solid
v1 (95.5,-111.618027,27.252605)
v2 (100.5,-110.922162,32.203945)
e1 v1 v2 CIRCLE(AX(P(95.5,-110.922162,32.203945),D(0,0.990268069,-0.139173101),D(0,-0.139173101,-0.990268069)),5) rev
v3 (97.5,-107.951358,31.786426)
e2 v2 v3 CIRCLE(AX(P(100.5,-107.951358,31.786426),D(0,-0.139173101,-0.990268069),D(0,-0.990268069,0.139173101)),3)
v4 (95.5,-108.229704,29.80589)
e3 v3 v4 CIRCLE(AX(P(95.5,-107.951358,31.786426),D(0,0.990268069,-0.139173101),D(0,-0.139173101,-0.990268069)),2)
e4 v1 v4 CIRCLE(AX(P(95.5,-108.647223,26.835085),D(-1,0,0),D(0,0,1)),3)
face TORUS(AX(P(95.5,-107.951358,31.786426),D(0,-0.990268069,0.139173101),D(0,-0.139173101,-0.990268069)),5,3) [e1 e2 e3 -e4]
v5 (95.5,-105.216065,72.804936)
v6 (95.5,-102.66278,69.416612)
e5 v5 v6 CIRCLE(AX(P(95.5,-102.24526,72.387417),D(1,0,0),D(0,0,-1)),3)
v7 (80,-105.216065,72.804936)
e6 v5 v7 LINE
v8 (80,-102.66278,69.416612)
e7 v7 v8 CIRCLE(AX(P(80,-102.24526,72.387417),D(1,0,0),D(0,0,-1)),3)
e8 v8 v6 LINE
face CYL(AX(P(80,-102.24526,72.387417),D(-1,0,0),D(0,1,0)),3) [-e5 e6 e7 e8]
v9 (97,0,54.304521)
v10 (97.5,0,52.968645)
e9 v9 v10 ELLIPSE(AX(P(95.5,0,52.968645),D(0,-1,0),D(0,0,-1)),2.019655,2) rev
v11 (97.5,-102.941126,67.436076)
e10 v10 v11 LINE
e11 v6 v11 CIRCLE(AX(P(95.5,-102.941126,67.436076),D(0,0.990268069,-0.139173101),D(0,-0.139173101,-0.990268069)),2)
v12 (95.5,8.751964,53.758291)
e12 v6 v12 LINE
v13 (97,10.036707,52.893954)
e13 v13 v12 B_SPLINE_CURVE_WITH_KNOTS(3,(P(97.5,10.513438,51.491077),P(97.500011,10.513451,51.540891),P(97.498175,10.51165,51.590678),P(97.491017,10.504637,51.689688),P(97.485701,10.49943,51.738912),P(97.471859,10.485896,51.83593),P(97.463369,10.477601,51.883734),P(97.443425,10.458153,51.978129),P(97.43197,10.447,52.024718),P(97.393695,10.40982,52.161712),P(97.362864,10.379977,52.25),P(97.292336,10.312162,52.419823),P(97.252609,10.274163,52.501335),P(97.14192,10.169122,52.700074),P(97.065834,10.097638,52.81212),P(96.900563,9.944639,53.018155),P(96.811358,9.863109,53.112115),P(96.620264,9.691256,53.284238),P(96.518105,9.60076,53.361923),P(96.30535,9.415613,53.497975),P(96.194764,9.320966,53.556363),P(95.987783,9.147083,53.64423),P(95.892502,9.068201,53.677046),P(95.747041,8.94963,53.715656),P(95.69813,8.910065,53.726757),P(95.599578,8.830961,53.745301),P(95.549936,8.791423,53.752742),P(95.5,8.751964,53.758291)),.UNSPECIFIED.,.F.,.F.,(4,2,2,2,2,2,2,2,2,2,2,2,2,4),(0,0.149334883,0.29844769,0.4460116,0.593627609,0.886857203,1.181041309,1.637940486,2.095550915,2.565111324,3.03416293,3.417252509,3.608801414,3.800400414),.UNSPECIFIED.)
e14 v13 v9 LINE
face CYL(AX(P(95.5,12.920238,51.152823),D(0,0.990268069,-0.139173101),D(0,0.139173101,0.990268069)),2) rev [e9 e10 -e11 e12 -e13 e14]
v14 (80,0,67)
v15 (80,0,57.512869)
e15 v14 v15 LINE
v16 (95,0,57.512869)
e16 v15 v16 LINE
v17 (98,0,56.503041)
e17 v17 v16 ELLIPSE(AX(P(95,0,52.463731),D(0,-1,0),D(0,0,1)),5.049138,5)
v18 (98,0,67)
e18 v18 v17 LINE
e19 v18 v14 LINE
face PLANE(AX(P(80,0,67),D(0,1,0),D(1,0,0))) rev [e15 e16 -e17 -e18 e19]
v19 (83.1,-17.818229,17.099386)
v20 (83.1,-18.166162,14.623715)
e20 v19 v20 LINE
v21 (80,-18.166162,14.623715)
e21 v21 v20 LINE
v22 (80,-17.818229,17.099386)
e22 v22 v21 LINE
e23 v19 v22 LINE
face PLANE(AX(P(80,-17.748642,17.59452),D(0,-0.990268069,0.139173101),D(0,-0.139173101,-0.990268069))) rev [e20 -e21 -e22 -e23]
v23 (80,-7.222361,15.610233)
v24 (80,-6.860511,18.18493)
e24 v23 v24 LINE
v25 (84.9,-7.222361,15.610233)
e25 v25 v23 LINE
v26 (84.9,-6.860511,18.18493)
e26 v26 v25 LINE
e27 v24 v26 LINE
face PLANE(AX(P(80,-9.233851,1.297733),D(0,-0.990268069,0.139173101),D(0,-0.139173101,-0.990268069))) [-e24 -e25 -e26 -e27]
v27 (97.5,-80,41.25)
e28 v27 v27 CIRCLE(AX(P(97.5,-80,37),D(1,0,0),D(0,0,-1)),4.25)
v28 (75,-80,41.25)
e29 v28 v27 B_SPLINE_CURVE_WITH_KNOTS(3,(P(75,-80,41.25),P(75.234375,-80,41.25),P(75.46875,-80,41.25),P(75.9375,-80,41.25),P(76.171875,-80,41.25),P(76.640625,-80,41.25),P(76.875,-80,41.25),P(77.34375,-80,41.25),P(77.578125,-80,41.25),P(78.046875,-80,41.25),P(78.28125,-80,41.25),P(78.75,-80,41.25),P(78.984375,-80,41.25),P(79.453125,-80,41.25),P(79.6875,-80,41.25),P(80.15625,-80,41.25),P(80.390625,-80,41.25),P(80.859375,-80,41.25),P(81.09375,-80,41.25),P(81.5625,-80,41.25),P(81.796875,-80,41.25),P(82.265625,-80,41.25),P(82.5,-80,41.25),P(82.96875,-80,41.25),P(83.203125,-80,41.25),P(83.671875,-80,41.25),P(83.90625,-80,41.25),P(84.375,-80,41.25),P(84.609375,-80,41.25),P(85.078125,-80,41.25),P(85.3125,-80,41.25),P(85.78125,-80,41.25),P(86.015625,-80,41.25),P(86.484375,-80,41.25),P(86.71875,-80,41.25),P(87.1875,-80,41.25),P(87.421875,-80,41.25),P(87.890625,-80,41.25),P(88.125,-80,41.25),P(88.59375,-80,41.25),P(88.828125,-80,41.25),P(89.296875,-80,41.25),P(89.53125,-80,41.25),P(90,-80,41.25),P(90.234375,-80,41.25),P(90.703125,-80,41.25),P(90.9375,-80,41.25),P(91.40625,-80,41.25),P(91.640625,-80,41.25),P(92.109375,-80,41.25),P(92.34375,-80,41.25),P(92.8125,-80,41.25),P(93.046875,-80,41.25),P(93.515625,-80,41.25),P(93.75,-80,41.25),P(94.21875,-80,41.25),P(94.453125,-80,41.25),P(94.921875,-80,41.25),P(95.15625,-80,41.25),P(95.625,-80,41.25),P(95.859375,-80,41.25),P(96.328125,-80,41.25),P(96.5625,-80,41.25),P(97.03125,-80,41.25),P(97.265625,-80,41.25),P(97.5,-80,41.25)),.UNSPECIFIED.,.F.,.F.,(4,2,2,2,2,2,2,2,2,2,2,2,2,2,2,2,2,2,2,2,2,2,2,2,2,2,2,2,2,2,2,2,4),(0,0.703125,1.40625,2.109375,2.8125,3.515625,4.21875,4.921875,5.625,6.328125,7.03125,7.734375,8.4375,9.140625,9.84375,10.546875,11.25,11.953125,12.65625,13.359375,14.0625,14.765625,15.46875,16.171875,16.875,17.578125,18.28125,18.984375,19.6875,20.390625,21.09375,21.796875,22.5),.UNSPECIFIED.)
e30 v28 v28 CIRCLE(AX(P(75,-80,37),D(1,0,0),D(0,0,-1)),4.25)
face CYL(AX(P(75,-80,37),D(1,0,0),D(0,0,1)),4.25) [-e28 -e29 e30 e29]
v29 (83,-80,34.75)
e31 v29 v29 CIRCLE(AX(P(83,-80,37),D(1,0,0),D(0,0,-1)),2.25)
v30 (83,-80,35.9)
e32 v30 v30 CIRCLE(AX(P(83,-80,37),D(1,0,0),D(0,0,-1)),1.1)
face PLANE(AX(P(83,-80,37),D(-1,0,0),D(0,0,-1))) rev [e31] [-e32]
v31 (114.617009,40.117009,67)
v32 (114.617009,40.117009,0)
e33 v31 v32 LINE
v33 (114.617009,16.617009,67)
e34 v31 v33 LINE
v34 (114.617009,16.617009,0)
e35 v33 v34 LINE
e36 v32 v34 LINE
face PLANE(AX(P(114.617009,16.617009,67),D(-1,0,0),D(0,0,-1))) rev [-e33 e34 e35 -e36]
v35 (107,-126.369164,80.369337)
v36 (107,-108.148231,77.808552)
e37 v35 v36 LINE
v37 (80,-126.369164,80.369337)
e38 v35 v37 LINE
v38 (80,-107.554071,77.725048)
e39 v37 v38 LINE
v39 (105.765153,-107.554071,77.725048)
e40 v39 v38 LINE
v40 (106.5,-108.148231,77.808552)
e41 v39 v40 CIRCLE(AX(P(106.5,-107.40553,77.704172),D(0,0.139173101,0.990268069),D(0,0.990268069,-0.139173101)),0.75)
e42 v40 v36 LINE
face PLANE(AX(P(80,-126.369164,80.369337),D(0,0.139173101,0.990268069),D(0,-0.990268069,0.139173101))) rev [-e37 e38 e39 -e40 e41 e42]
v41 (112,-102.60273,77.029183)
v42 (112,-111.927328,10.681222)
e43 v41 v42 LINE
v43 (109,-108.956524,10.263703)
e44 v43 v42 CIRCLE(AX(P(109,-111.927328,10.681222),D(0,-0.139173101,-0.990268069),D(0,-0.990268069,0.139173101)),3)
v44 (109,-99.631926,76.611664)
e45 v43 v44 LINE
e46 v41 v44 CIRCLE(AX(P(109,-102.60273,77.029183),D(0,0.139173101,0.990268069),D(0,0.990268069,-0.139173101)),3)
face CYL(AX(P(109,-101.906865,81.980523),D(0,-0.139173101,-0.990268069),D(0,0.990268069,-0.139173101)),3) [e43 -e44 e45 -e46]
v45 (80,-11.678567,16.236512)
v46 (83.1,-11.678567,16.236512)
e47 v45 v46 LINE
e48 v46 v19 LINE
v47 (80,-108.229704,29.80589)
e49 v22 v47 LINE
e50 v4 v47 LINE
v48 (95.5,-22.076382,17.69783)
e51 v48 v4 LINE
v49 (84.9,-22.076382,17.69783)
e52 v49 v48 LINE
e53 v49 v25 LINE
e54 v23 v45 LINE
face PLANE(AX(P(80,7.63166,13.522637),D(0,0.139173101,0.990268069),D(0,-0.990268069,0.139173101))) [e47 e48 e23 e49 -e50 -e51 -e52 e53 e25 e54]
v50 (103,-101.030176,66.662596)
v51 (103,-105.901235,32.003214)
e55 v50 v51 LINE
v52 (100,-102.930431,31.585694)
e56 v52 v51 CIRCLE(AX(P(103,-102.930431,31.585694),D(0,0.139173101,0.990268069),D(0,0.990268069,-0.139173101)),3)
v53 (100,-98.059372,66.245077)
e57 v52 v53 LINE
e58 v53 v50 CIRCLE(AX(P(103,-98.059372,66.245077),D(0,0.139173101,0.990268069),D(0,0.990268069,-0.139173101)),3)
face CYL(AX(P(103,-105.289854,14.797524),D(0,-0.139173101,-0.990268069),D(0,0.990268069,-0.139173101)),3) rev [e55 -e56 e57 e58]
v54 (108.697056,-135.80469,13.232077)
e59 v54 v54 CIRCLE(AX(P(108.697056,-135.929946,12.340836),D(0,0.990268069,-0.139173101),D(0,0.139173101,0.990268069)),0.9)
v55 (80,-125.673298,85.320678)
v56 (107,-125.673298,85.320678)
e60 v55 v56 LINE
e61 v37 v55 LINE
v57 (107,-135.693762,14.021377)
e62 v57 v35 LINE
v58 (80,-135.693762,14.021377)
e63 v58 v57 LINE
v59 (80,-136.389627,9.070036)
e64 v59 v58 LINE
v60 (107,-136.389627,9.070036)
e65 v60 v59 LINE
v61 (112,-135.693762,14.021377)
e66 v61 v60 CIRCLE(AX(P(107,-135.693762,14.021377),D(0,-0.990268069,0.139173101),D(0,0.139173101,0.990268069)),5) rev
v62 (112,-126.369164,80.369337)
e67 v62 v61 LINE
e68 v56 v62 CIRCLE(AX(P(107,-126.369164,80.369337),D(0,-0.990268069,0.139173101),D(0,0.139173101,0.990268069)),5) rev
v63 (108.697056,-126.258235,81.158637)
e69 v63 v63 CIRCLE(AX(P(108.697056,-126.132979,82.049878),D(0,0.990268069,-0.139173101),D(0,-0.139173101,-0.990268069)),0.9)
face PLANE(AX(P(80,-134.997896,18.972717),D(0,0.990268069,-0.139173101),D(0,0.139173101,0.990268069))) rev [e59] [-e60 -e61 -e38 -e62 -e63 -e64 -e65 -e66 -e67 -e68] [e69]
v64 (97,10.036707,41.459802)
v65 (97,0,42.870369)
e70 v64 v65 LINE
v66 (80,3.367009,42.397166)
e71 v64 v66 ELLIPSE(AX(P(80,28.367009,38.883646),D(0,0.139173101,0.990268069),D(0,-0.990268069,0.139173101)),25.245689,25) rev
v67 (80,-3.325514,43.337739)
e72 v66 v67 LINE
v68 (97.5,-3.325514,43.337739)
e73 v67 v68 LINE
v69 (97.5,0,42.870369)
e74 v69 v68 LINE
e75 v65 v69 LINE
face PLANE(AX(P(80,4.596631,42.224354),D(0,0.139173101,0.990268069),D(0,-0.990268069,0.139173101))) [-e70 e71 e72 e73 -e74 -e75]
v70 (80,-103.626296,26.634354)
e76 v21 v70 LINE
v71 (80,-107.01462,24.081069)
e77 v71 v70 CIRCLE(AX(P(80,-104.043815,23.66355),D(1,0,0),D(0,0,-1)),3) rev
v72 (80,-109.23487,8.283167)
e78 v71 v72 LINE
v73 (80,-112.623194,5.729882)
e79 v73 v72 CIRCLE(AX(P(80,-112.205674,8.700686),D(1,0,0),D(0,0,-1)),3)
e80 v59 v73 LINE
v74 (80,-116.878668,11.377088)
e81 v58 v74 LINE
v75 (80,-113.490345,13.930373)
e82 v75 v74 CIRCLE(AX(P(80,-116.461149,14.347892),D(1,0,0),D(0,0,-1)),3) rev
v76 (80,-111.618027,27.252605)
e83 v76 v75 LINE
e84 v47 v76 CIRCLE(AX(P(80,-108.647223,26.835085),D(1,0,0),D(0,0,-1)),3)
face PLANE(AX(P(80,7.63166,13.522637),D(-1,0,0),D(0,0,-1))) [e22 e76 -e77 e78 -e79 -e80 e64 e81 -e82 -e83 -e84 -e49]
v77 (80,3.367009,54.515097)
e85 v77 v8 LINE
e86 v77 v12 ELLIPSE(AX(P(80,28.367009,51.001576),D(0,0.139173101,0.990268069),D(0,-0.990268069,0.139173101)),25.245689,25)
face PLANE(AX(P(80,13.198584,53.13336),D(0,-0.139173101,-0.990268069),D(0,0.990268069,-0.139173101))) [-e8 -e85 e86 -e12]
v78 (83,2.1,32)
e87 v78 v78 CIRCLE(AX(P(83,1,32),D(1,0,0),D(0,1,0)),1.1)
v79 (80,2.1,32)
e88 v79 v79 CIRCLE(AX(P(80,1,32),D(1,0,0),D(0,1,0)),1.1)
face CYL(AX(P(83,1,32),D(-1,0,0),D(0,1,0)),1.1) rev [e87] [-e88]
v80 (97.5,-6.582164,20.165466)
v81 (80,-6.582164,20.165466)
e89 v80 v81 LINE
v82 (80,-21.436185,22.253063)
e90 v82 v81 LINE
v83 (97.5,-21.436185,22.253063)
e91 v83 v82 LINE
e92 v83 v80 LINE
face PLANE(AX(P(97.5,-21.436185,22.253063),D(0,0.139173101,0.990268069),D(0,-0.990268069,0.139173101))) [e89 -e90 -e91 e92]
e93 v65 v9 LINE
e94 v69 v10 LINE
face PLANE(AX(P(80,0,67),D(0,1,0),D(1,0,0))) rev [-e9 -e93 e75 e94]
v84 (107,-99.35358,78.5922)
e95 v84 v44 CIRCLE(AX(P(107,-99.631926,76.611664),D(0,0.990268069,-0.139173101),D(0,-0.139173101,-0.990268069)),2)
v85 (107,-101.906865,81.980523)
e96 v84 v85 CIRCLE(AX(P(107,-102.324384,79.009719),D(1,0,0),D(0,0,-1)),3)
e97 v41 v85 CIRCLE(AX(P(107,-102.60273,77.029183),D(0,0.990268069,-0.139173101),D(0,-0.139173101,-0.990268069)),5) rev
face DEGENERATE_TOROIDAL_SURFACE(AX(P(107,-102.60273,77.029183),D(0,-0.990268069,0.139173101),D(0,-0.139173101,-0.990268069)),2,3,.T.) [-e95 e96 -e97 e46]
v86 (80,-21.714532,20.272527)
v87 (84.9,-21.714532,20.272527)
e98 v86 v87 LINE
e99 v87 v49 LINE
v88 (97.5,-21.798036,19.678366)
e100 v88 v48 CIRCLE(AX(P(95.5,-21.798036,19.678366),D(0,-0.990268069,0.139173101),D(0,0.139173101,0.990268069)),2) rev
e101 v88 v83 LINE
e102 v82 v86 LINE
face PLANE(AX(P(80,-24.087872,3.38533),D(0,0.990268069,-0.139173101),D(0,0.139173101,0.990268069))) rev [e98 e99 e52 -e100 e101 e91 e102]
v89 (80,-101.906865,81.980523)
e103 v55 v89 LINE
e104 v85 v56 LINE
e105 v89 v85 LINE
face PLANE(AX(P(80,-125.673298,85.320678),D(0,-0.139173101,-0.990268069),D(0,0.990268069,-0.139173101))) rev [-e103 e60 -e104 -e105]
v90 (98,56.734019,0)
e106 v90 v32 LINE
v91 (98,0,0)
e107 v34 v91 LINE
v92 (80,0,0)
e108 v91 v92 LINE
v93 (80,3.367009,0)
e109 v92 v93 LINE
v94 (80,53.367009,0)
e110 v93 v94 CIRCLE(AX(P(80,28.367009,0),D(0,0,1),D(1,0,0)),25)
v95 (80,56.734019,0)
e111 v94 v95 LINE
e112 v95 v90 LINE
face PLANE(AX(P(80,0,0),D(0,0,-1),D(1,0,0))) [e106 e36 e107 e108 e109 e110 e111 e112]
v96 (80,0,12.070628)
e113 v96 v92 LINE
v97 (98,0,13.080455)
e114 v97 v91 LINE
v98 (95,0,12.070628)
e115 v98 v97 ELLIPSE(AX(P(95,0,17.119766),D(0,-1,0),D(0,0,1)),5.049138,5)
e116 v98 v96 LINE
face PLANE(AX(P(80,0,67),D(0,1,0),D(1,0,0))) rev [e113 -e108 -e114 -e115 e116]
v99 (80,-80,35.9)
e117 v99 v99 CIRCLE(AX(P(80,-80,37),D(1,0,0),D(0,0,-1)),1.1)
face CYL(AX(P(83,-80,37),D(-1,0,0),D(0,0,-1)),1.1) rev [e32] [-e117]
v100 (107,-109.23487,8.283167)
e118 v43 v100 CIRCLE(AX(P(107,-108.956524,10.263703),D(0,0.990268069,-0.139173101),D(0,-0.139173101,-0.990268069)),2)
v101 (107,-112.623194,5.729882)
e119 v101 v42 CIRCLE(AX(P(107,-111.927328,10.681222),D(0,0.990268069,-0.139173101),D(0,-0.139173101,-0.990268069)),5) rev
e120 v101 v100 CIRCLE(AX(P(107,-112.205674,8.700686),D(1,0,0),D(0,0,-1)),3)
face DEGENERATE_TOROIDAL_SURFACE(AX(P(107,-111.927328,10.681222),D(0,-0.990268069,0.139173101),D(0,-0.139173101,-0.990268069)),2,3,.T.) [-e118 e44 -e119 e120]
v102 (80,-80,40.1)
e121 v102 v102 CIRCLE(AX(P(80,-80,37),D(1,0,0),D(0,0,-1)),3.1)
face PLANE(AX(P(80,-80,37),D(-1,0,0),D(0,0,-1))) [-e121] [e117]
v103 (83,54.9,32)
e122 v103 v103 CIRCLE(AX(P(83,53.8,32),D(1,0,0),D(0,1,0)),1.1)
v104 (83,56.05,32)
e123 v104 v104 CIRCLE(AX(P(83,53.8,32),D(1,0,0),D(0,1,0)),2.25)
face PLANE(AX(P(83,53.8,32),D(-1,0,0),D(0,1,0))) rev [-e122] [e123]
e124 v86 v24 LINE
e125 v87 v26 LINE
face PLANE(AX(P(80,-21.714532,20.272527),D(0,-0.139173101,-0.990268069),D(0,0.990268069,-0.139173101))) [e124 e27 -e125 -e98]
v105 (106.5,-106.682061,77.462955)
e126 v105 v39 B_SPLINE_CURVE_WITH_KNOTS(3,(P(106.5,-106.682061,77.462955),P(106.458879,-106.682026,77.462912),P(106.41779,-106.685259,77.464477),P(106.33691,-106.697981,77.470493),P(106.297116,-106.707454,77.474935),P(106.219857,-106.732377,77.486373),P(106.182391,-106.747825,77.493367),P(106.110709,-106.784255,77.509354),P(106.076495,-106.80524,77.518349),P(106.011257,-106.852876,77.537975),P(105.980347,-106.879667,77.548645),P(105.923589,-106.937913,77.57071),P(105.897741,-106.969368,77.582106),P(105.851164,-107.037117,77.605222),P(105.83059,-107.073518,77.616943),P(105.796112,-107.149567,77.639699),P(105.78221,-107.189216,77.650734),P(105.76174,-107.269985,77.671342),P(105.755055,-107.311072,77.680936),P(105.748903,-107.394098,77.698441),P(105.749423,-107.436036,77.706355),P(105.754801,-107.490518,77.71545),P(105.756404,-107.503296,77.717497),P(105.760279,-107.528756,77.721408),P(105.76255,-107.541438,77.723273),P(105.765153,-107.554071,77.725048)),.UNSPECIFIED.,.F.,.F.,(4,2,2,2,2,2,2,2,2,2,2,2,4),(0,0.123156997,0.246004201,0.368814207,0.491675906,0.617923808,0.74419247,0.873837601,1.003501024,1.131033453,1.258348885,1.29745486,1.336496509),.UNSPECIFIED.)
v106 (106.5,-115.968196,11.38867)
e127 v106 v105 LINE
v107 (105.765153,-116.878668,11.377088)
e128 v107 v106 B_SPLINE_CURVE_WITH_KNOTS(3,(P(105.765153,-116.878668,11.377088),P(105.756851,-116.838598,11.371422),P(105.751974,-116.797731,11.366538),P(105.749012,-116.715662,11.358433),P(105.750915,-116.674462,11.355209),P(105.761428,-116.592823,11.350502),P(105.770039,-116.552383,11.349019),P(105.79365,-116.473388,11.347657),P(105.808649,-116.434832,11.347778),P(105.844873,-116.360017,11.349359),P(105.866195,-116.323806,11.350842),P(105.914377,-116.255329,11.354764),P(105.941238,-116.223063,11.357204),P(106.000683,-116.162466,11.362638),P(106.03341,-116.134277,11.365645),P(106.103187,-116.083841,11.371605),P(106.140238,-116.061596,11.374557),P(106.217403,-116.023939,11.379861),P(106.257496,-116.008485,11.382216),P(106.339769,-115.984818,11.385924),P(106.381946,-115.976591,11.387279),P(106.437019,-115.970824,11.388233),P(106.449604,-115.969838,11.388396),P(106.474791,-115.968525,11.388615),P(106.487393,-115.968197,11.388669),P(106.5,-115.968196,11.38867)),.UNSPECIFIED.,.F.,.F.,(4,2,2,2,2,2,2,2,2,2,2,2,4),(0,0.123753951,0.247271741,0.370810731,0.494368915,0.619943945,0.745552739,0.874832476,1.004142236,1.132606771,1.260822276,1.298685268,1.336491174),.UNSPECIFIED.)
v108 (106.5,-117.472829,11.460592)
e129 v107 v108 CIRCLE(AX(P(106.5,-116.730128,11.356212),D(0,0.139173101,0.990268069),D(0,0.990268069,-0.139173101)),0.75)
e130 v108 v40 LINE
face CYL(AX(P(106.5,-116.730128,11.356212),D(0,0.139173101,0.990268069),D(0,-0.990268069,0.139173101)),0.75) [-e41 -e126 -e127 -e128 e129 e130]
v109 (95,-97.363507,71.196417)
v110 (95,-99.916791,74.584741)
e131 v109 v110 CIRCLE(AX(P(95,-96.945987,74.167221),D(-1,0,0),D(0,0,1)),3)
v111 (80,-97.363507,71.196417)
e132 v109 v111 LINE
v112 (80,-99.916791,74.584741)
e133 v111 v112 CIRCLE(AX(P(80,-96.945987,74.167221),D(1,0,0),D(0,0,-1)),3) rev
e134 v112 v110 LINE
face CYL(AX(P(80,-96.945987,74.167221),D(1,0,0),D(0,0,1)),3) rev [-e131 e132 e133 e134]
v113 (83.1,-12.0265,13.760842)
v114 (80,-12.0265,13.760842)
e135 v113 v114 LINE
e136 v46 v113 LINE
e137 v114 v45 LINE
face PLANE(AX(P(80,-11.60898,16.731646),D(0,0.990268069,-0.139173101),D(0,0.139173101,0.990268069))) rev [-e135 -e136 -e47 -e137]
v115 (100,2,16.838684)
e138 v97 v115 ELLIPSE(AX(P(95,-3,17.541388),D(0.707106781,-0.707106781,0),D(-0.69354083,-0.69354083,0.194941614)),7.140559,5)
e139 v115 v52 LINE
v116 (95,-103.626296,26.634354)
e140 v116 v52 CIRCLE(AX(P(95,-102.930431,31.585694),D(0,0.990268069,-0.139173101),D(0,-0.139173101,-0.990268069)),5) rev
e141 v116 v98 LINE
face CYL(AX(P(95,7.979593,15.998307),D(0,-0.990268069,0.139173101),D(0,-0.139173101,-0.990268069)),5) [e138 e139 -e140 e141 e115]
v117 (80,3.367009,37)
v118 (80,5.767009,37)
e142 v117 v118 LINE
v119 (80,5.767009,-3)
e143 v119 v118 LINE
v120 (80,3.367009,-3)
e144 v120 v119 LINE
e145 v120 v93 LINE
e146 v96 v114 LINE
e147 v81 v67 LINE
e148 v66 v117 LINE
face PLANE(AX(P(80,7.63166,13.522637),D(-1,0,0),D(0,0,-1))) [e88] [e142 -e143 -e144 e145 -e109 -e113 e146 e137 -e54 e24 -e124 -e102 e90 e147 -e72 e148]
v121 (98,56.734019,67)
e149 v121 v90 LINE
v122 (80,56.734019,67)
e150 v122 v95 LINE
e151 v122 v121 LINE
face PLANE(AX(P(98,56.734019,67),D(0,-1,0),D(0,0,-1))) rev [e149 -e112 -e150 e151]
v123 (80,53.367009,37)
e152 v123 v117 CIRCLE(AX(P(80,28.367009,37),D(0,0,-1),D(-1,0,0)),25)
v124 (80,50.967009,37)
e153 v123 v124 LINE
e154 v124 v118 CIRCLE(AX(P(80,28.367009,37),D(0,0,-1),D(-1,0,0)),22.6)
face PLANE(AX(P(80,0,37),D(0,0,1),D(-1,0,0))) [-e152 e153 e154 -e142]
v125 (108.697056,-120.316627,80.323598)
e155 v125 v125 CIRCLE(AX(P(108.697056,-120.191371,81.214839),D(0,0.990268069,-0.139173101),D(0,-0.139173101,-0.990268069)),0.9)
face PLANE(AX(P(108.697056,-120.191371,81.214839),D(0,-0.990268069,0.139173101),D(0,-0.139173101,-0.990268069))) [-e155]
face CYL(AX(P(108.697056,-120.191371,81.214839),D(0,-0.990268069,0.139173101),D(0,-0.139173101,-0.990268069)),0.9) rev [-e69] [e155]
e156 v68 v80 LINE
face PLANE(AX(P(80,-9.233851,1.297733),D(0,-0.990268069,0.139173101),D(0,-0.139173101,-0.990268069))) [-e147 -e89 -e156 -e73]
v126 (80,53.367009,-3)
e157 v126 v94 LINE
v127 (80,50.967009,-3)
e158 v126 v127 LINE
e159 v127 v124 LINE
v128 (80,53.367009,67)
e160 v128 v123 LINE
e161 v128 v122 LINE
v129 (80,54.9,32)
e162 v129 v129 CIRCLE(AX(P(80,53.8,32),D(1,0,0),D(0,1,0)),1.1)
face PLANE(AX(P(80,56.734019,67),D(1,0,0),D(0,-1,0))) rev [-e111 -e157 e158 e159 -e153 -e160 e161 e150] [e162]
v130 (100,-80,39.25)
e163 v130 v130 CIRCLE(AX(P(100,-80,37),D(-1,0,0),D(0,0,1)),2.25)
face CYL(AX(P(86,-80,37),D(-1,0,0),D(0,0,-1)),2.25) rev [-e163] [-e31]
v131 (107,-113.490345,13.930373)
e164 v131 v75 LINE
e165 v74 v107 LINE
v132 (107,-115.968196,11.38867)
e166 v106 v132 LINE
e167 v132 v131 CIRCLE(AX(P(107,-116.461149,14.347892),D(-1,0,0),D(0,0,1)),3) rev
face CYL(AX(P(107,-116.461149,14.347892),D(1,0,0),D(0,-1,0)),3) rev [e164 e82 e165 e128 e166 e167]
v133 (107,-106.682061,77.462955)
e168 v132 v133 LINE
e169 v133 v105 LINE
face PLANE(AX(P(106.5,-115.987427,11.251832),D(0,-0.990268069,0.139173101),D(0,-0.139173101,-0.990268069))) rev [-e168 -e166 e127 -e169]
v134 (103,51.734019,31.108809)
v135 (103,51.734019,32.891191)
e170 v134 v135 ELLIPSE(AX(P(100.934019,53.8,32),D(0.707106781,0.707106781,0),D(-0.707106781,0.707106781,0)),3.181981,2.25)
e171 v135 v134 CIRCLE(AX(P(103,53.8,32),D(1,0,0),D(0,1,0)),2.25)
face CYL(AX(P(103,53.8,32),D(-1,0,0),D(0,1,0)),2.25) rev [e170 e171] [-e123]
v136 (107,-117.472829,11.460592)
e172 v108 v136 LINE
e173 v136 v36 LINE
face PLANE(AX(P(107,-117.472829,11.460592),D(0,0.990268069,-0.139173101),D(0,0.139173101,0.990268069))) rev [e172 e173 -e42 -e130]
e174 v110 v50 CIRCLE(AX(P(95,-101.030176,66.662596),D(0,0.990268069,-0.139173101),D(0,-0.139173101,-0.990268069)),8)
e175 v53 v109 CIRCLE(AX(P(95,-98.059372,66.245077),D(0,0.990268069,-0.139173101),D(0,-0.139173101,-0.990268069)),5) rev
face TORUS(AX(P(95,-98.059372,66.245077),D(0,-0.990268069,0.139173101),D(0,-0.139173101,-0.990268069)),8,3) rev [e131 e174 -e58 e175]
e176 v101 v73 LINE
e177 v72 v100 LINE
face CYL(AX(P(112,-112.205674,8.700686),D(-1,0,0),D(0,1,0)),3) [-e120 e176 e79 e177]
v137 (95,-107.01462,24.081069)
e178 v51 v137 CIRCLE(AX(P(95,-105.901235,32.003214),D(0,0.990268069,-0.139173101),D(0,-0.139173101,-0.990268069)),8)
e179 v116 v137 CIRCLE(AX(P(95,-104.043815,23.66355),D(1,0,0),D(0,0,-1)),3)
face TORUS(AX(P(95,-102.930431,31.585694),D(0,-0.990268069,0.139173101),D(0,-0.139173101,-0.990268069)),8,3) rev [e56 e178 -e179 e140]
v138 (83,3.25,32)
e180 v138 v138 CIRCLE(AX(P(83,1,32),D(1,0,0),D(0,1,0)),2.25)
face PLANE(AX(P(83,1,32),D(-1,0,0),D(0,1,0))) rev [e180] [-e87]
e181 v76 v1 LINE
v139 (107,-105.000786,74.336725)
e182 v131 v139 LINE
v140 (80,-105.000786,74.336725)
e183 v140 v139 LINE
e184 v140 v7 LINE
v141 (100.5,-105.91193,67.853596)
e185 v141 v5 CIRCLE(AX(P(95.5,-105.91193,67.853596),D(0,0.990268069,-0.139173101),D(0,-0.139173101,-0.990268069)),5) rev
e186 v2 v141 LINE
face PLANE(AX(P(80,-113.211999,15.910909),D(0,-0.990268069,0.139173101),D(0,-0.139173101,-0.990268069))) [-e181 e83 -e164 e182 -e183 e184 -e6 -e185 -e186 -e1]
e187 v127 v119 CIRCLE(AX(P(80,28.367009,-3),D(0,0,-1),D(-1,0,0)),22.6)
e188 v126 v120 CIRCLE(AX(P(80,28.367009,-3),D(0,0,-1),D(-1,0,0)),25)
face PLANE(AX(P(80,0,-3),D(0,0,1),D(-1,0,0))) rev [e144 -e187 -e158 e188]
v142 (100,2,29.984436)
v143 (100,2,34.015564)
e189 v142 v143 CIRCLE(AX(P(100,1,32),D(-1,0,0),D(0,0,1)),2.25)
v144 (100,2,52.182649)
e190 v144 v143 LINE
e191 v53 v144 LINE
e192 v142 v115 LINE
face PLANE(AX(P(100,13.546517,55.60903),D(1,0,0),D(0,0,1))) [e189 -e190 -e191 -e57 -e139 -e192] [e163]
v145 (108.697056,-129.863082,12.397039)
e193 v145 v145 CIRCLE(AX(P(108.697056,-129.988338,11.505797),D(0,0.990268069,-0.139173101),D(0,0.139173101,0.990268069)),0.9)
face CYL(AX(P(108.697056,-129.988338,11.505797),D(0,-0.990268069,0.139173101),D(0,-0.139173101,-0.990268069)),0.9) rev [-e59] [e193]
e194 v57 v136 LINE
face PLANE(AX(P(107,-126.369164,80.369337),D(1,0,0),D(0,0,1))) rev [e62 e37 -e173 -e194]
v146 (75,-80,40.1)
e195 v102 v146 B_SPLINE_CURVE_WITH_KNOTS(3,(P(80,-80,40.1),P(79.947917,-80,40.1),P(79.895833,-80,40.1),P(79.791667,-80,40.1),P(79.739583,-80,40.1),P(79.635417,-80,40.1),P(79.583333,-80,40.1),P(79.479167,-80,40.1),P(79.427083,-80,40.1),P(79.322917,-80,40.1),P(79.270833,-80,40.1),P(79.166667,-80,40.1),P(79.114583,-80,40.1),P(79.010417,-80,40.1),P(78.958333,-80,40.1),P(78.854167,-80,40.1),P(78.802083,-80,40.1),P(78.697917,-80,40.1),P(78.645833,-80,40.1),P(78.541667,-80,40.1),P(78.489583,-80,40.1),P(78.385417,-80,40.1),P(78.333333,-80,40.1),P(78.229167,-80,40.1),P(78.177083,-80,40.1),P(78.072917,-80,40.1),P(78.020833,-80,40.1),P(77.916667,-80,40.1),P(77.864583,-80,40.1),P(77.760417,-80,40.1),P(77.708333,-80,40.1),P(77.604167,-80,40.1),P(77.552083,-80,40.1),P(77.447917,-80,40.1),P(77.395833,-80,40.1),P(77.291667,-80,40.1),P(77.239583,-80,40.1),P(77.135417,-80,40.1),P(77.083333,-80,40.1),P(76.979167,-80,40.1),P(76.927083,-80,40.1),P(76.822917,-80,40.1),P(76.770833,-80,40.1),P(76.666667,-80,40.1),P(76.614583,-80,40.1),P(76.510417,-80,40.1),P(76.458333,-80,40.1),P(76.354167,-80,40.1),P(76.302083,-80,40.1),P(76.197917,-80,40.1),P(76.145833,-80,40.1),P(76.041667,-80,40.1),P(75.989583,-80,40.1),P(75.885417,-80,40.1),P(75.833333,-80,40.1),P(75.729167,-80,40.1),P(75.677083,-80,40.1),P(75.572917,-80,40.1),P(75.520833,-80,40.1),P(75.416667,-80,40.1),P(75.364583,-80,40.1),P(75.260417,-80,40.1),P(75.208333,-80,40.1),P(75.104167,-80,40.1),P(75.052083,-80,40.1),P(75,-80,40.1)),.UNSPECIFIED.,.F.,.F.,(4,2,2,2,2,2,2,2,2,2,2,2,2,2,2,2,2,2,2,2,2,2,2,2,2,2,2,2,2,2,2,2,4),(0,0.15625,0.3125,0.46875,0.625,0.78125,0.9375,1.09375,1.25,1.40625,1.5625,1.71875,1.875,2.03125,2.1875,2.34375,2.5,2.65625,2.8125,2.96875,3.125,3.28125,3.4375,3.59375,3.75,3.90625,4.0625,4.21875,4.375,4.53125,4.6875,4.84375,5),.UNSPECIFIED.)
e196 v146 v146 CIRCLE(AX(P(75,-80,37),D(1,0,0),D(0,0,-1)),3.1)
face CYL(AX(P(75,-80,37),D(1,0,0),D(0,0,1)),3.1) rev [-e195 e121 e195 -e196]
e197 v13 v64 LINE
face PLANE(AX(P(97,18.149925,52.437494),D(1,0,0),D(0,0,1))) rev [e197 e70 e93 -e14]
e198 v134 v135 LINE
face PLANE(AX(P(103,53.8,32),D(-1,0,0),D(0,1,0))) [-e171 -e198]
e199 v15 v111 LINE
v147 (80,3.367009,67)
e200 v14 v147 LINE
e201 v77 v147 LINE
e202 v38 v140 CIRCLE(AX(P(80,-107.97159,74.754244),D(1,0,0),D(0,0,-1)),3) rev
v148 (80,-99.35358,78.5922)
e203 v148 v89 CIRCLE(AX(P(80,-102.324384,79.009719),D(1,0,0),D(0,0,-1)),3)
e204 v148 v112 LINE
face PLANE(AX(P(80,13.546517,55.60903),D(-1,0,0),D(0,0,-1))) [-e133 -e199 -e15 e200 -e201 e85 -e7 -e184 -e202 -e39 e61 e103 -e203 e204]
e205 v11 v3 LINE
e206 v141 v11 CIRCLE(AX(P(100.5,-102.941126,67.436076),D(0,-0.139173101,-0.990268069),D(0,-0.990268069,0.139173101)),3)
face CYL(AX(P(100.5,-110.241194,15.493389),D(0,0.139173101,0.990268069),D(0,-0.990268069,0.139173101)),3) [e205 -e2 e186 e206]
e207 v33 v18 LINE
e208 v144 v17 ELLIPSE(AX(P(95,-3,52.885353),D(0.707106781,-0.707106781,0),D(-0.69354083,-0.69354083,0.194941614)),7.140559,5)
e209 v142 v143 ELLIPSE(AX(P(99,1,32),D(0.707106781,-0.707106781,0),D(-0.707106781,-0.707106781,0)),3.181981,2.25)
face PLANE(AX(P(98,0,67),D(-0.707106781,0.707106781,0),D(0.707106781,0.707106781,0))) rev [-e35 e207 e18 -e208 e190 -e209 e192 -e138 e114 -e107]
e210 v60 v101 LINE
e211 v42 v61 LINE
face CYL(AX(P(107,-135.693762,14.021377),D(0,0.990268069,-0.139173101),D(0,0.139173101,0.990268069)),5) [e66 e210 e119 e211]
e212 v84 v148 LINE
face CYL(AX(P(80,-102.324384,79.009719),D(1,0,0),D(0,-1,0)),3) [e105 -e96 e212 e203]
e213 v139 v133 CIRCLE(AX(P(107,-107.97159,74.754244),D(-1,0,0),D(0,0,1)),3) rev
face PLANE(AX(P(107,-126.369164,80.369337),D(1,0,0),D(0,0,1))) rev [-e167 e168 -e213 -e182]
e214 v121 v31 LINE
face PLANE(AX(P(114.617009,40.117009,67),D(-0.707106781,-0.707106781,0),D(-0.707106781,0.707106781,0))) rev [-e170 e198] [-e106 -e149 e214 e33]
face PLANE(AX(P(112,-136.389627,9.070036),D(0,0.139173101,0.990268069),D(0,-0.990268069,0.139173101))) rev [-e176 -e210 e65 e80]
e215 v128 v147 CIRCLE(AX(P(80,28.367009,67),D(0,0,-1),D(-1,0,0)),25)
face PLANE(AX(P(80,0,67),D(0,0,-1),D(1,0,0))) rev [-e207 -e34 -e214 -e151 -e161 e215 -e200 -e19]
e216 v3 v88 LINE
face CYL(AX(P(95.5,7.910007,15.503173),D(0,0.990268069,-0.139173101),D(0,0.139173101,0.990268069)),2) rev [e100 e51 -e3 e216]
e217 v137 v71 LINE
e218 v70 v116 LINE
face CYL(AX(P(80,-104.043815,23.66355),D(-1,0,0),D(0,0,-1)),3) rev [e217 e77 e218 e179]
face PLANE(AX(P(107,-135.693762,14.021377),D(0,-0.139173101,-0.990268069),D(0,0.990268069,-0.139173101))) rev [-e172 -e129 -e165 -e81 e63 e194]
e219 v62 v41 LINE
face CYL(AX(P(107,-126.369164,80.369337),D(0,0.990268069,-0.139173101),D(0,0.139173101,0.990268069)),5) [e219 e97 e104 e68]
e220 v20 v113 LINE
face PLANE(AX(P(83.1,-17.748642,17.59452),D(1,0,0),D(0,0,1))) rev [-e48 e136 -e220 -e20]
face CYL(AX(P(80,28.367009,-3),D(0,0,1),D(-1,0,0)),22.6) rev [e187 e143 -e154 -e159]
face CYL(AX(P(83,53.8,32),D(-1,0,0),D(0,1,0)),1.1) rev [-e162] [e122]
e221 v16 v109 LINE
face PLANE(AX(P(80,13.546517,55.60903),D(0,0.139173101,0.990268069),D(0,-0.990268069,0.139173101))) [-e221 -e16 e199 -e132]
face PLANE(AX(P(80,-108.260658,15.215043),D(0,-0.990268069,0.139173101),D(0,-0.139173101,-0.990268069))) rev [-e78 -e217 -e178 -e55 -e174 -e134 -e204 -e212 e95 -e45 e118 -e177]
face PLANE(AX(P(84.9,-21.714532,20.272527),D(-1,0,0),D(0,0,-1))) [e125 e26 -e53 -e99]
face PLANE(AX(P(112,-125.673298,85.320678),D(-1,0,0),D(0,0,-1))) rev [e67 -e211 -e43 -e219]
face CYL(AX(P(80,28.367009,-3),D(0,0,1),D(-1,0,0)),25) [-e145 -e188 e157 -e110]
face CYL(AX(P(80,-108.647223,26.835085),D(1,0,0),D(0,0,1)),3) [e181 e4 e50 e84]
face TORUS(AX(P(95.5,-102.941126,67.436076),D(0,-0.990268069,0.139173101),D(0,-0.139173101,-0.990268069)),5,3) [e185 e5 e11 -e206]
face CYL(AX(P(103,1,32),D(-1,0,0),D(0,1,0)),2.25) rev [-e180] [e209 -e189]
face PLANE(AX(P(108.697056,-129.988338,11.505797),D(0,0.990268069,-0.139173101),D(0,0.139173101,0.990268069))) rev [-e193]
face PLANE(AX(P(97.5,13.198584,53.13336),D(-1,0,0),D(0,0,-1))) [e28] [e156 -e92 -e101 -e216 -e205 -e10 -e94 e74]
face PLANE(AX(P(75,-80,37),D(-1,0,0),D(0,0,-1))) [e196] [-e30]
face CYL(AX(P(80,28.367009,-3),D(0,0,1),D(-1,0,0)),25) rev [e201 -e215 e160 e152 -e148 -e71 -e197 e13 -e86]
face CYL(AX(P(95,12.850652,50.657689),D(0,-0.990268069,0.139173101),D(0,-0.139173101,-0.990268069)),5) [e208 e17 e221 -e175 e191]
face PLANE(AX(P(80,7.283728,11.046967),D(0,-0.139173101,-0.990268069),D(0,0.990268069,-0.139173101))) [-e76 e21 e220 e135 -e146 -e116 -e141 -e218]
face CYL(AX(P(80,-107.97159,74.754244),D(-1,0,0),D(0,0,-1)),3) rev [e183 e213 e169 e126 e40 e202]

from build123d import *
from build123d.topology import SkipClean

# Parameters (mm, degrees)
Y_KSEKLIK_EKSTR_ZYON1_DEPTH      = 67
IZIM2_R                          = 25.000000000000004
KES_EKSTR_ZYON1_DEPTH            = 70
Y_KSEKLIK_EKSTR_ZYON2_DEPTH      = 40
Y_KSEKLIK_EKSTR_ZYON7_DEPTH      = 100
Y_KSEKLIK_EKSTR_ZYON7_DEPTH_BACK = 15
IZIM11_R                         = 22.5
KES_EKSTR_ZYON17_DEPTH           = 33
KES_EKSTR_ZYON18_DEPTH           = 20
Y_KSEKLIK_EKSTR_ZYON12_DEPTH     = 8
Y_KSEKLIK_EKSTR_ZYON14_DEPTH     = 15
KES_EKSTR_ZYON20_DEPTH           = 3
IZIM44_R                         = 22.600000000000005
KES_EKSTR_ZYON25_DEPTH           = 30
RADYUS4_R                        = 5
RADYUS5_START                    = -109.324597764
RADYUS5_DEPTH                    = 115
Y_KSEKLIK_EKSTR_ZYON27_DEPTH     = 27
Y_KSEKLIK_EKSTR_ZYON29_START     = 5
Y_KSEKLIK_EKSTR_ZYON29_DEPTH     = 5
RADYUS6_R                        = 3
RADYUS7_R                        = 5
IZIM53_R                         = 1.0999999999999992
IZIM53_R_2                       = 1.0999999999999983
KES_EKSTR_ZYON28_DEPTH           = 3
IZIM54_R                         = 4.249999999999999
IZIM54_R_2                       = 3.099999999999997
Y_KSEKLIK_EKSTR_ZYON33_DEPTH     = 22.5
Y_KSEKLIK_EKSTR_ZYON34_DEPTH     = 67
RADYUS9_R                        = 3
IZIM63_R                         = 0.8999999999999964
IZIM63_R_2                       = 0.8999999999999968
KES_EKSTR_ZYON30_DEPTH           = 6
RADYUS10_R                       = 3
KES_EKSTR_ZYON31_START           = -10
IZIM64_R                         = 3.099999999999997
KES_EKSTR_ZYON31_DEPTH           = 10
IZIM65_R                         = 2.2499999999999996
IZIM65_R_2                       = 2.249999999999999
KES_EKSTR_ZYON32_DEPTH           = 20
IZIM68_R                         = 3.099999999999997
Y_KSEKLIK_EKSTR_ZYON35_DEPTH     = 5
IZIM69_R                         = 1.1000000000000003
KES_EKSTR_ZYON35_DEPTH           = 3
IZIM70_R                         = 2.2500000000000027
KES_EKSTR_ZYON36_DEPTH           = 3
Y_KSEKLIK_EKSTR_ZYON36_START     = 15
IZIM71_R                         = 3.099999999999997
IZIM71_R_2                       = 2.2500000000000027
Y_KSEKLIK_EKSTR_ZYON36_DEPTH     = 15
IZIM72_R                         = 25.000000000000004
KES_EKSTR_ZYON37_DEPTH           = 30


with BuildPart() as part:
    # Çizim1 → Yükseklik-Ekstrüzyon1 (new body)
    with BuildSketch(Plane.XY):
        Polygon((0, 0), (-18, -2.2e-15), (-34.617009357884086, 16.617009357883635), (-34.617009357884086, 40.117009357883624), (-18.000000000000455, 56.73401871576772), (-4.545e-13, 56.73401871576772), align=None)
    extrude(amount=Y_KSEKLIK_EKSTR_ZYON1_DEPTH)

    # Çizim2 → Kes-Ekstrüzyon1 (cut)
    with BuildSketch(Plane.XY.offset(67)):
        with Locations((0, 28.367009357883862)):
            Circle(IZIM2_R)
    extrude(amount=-KES_EKSTR_ZYON1_DEPTH, mode=Mode.SUBTRACT)

    # Çizim5 → Yükseklik-Ekstrüzyon2 (add)
    with BuildSketch(Plane.XY.offset(37.00000000000001)):
        with BuildLine():
            Line((0, 50.96700935788387), (-4.2591e-13, 53.367009357883866))
            ThreePointArc((-4.2591e-13, 53.36700935788386), (-25, 28.367009357883667), (-3.412e-14, 3.3670093578838625))
            Line((-2.697e-14, 3.367009357883862), (0, 5.767009357883861))
            ThreePointArc((-4.15e-15, 5.767009357883861), (-22.6, 28.367009357883866), (1.38e-15, 50.96700935788387))
        make_face()
    extrude(amount=-Y_KSEKLIK_EKSTR_ZYON2_DEPTH)

    # Çizim24 → Kes-Ekstrüzyon18 (cut)
    with BuildSketch(Plane(origin=(0, -9.233851419869488, 1.2977331860663228), x_dir=(0, -0.13917310096006572, -0.9902680687415703), z_dir=(0, -0.9902680687415703, 0.13917310096006572))):
        Polygon((-54.45315730366845, 3.1e-16), (-42.45315730366844, 0), (-42.45315730366844, -17), (-54.45315730366845, -17), align=None)
    extrude(amount=-KES_EKSTR_ZYON18_DEPTH, mode=Mode.SUBTRACT)



with BuildPart() as body_2:
    # Çizim21 → Yükseklik-Ekstrüzyon7 (new, two sides: drawn at the far end of the back side and taken through both)
    with BuildSketch(Plane(origin=(0, -9.233851419869488, 1.2977331860663228), x_dir=(0, -0.13917310096006572, -0.9902680687415703), z_dir=(0, -0.9902680687415703, 0.13917310096006572)).offset(-Y_KSEKLIK_EKSTR_ZYON7_DEPTH_BACK)):
        Polygon((-56.95315730366845, 0), (-56.95315730366844, -20), (-11.95315730366845, -19.999999999999993), (-11.953157303668451, 8.27e-15), (-14.453157303668451, 7.96e-15), (-14.45315730366845, -17.499999999999996), (-54.45315730366845, -17.499999999999996), (-54.45315730366845, 3.1e-16), align=None)
    extrude(amount=Y_KSEKLIK_EKSTR_ZYON7_DEPTH + Y_KSEKLIK_EKSTR_ZYON7_DEPTH_BACK)

    # Çizim11 → Kes-Ekstrüzyon17 (cut)
    with BuildSketch(Plane.XY.offset(37.00000000000001)):
        with Locations((0, 28.367009357883862)):
            Circle(IZIM11_R)
    extrude(amount=-KES_EKSTR_ZYON17_DEPTH, mode=Mode.SUBTRACT)


with BuildPart() as part_1:
    add(part.part)

    add(body_2.part)  # Yükseklik-Ekstrüzyon12 merges body 2
    # Çizim29 → Yükseklik-Ekstrüzyon12 (add)
    with BuildSketch(Plane(origin=(0, -9.233851419869488, 1.2977331860663228), x_dir=(0, -0.13917310096006572, -0.9902680687415703), z_dir=(0, -0.9902680687415703, 0.13917310096006572))):
        Polygon((-42.45315730366844, 0), (-14.453157303668446, 0), (-14.453157303668442, -17.499999999999996), (-42.45315730366844, -17.499999999999996), align=None)
    extrude(amount=-Y_KSEKLIK_EKSTR_ZYON12_DEPTH)

    # Çizim31 → Yükseklik-Ekstrüzyon14 (add)
    with BuildSketch(Plane(origin=(0, -9.233851419869485, 1.2977331860663224), x_dir=(1, 0, 0), z_dir=(0, -0.9902680687415703, 0.13917310096006574))):
        Polygon((9.7e-16, 19.053157303668446), (2.4e-16, 17.053157303668446), (-4.9, 17.053157303668442), (-4.9, 14.45315730366844), (-17.499999999999996, 14.45315730366844), (-17.499999999999996, 19.053157303668446), align=None)
    extrude(amount=Y_KSEKLIK_EKSTR_ZYON14_DEPTH)

    # Çizim34 → Kes-Ekstrüzyon20 (cut)
    with BuildSketch(Plane(origin=(-1.1e-15, 1.663557968214996, 11.83682999846795), x_dir=(-1, -1e-17, -9e-17), z_dir=(0, -0.13917310096006574, -0.9902680687415703))):
        Polygon((-1.17e-15, -20.024597764324398), (3.0999999999999988, -20.024597764324398), (3.0999999999999983, -13.824597764324396), (-1.17e-15, -13.824597764324396), align=None)
    extrude(amount=-KES_EKSTR_ZYON20_DEPTH, mode=Mode.SUBTRACT)

    # Çizim44 → Kes-Ekstrüzyon25 (cut)
    with SkipClean():  # the faces are left unmerged after this step: merging them gives an invalid solid
        with BuildSketch(Plane.XY.offset(37.00000000000001)):
            with Locations((0, 28.367009357883862)):
                Circle(IZIM44_R)
        extrude(amount=-KES_EKSTR_ZYON25_DEPTH, mode=Mode.SUBTRACT)

    # Radyus4
    radyus4_edges = [part_1.edges().sort_by_distance(p)[0] for p in [
        (-19.999999999999993, -52.29855016290579, 19.420709717516388),
        (-20, -49.167155391304306, 64.42286164587061),
    ]]
    fillet(radyus4_edges, radius=RADYUS4_R)

    # Radyus5: read off the stored shape, not the designer's step
    # Radyus5 outline → Radyus5 (add)
    with SkipClean():  # the faces are left unmerged after this step: merging them gives an invalid solid
        with BuildSketch(Plane(origin=(0, 0, 0), x_dir=(1, 0, 0), z_dir=(0, 0.9902680687415703, -0.13917310096006602)).offset(RADYUS5_START)):
            with BuildLine():
                Line((-17.5, -52.453157304), (-17.5, -54.453157304))
                Line((-17.5, -54.453157304), (-15.5, -54.453157304))
                ThreePointArc((-15.5, -54.453157304), (-16.914213562, -53.867370866), (-17.5, -52.453157304))
            make_face()
            with BuildLine():
                Line((-17.5, -14.453157304), (-17.5, -16.453157304))
                ThreePointArc((-17.5, -16.453157304), (-16.914213562, -15.038943742), (-15.5, -14.453157304))
                Line((-15.5, -14.453157304), (-17.5, -14.453157304))
            make_face()
        extrude(amount=RADYUS5_DEPTH)



with BuildPart() as body_2_2:
    # Çizim45 → Yükseklik-Ekstrüzyon27 (new body)
    with BuildSketch(Plane(origin=(0, -108.26065829402661, 15.215043282072942), x_dir=(1, 0, 0), z_dir=(0, -0.9902680687415704, 0.13917310096006608))):
        Polygon((0, 67), (-32, 67), (-32, -10), (1.22e-15, -10), (0, -4.999999999999998), (-26.999999999999996, -4.999999999999998), (-27, 62), (6.1e-16, 62.00000000000001), align=None)
    extrude(amount=Y_KSEKLIK_EKSTR_ZYON27_DEPTH)


with BuildPart() as part_2:
    with SkipClean():  # the faces are left unmerged after this step: merging them gives an invalid solid
        add(part_1.part)

        add(body_2_2.part)  # Yükseklik-Ekstrüzyon29 merges body 2 2
        # Çizim58 → Yükseklik-Ekstrüzyon29 (add)
        with BuildSketch(Plane(origin=(0, -108.26065829402661, 15.215043282072942), x_dir=(1, 0, 0), z_dir=(0, -0.9902680687415704, 0.13917310096006608)).offset(Y_KSEKLIK_EKSTR_ZYON29_START)):
            with BuildLine():
                Line((-15.000000000000002, 56.95315730366841), (0, 56.95315730366841))
                Line((4.1e-16, 56.95315730366841), (6.1e-16, 62.00000000000003))
                Line((0, 62.00000000000003), (-27, 62.000000000000014))
                Line((-27, 62.000000000000014), (-26.999999999999996, -4.999999999999997))
                Line((-26.999999999999996, -4.999999999999997), (0, -4.999999999999997))
                Line((0, -4.999999999999998), (6.94e-15, 11.953157303668416))
                Line((8.88e-15, 11.953157303668416), (-14.999999999999993, 11.953157303668416))
                ThreePointArc((-14.999999999999993, 11.953157303668416), (-18.53553390593273, 13.417623397735682), (-19.999999999999993, 16.953157303668416))
                Line((-19.999999999999993, 16.953157303668412), (-20, 51.95315730366841))
                ThreePointArc((-20, 51.95315730366841), (-18.535533905932738, 55.48869120960115), (-15.000000000000002, 56.95315730366841))
            make_face()
            with BuildLine():
                ThreePointArc((-17.499999999999996, 52.453157303668426), (-16.91421356237308, 53.86737086604151), (-15.499999999999995, 54.45315730366841))
                Line((-15.499999999999995, 54.45315730366841), (0, 54.45315730366841))
                Line((3.1e-16, 54.45315730366841), (4.1e-16, 56.95315730366841))
                Line((0, 56.95315730366841), (-15.000000000000002, 56.95315730366841))
                ThreePointArc((-15.000000000000002, 56.95315730366841), (-18.535533905932738, 55.48869120960115), (-20, 51.95315730366841))
                Line((-20, 51.95315730366841), (-19.999999999999993, 16.953157303668412))
                ThreePointArc((-19.999999999999993, 16.953157303668416), (-18.53553390593273, 13.417623397735682), (-14.999999999999993, 11.953157303668416))
                Line((-14.999999999999993, 11.953157303668416), (8.88e-15, 11.953157303668416))
                Line((6.94e-15, 11.953157303668416), (7.96e-15, 14.453157303668414))
                Line((7.96e-15, 14.453157303668414), (-15.499999999999996, 14.453157303668437))
                ThreePointArc((-15.499999999999996, 14.453157303668439), (-16.914213562373092, 15.038943741295348), (-17.5, 16.453157303668444))
                Line((-17.499999999999996, 16.453157303668444), (-17.499999999999996, 19.05315730366844))
                Line((-17.499999999999996, 19.05315730366844), (-17.499999999999996, 52.45315730366843))
            make_face()
        extrude(amount=-Y_KSEKLIK_EKSTR_ZYON29_DEPTH)

    # Radyus6
    radyus6_edges = [part_2.edges().sort_by_distance(p)[0] for p in [
        (-19.999999999999996, -103.46570555421005, 49.33290482722616),
        (-7.499999999999993, -106.59710032581151, 27.051873280540846),
        (-18.535533905932738, -100.53812507017076, 70.163722363202),
        (-18.53553390593273, -106.39328603824929, 28.502087291250334),
        (-7.500000000000001, -100.33431078260855, 71.6139363739115),
        (-16, -98.93606052970219, 81.56300388775816),
        (-32, -104.29422491666473, 43.4376832412077),
        (-16, -109.65238930362727, 5.312362594657239),
    ]]
    fillet(radyus6_edges, radius=RADYUS6_R)

    # Radyus7
    # the kernel refuses this fillet: 5 mm, written as the material it takes off along each edge
    with BuildSketch(Plane(origin=(-27, -99.63192603450251, 76.61166354405032), x_dir=(-1.0000000000000002, 0, 0), z_dir=(0, -0.1391731009600661, -0.9902680687415706))) as radyus7_piece_1:
        with BuildLine():
            CenterArc((2, -3), 3, 0, 90)
            Line((5, -3), (5, 0))
            Line((5, 0), (2, 0))
        make_face()
    revolve(axis=Axis((-27, -99.63192603450251, 76.61166354405032), (0, 0.9902680687415704, -0.13917310096006608)), revolution_arc=90, mode=Mode.SUBTRACT)
    with BuildSketch(Plane(origin=(-27, -108.95652379882695, 10.263702938365089), x_dir=(0, -0.13917310096006605, -0.9902680687415703), z_dir=(1.0000000000000002, 0, 0))) as radyus7_piece_2:
        with BuildLine():
            CenterArc((2, -3), 3, 0, 90)
            Line((5, -3), (5, 0))
            Line((5, 0), (2, 0))
        make_face()
    revolve(axis=Axis((-27, -108.95652379882695, 10.263702938365089), (0, 0.9902680687415704, -0.13917310096006608)), revolution_arc=90, mode=Mode.SUBTRACT)
    with BuildSketch(Plane(origin=(-32, -98.9360605297022, 81.56300388775816), x_dir=(1, 3.9e-16, 2.79e-15), z_dir=(0, -0.9902680687415703, 0.13917310096006605))) as radyus7_piece_3:
        with BuildLine():
            CenterArc((RADYUS7_R, -RADYUS7_R), RADYUS7_R, 89.99999999999983, 90.00000000000014)
            Line((-1.407e-14, -RADYUS7_R), (0, 0))
            Line((0, 0), (RADYUS7_R, 0))
        make_face()
    extrude(amount=39.49999999999999, mode=Mode.SUBTRACT)
    with BuildSketch(Plane(origin=(-32, -109.65238930362727, 5.31236259465724), x_dir=(1, -1e-17, -4e-17), z_dir=(0, -0.9902680687415703, 0.13917310096006605))) as radyus7_piece_4:
        with BuildLine():
            CenterArc((RADYUS7_R, RADYUS7_R), RADYUS7_R, 180.00000000000006, 89.99999999999994)
            Line((-2.2e-16, RADYUS7_R), (0, 0))
            Line((0, 0), (RADYUS7_R, 0))
        make_face()
    extrude(amount=39.500000000000014, mode=Mode.SUBTRACT)

    # Çizim53 → Kes-Ekstrüzyon28 (cut)
    with BuildSketch(Plane(origin=(0, 0, 0), x_dir=(0, 0, -1), z_dir=(1, 8.07e-15, 0))):
        with Locations(Location((-32, 1, 0), (0, 0, 90))):
            Circle(IZIM53_R)
        with Locations(Location((-32.00000000000001, 53.8, 0), (0, 0, 90))):
            Circle(IZIM53_R_2)
    extrude(amount=-KES_EKSTR_ZYON28_DEPTH, mode=Mode.SUBTRACT)

    # Çizim54 → Yükseklik-Ekstrüzyon33 (add)
    with BuildSketch(Plane(origin=(-17.499999999999996, 0, 0), x_dir=(0, 0, -1), z_dir=(1, 0, 0))):
        with Locations(Location((-36.999999999999986, -80, 0), (0, 0, 180))):
            Circle(IZIM54_R)
        with Locations(Location((-36.999999999999986, -80, 0), (0, 0, 180))):
            Circle(IZIM54_R_2, mode=Mode.SUBTRACT)
    extrude(amount=Y_KSEKLIK_EKSTR_ZYON33_DEPTH)

    # Çizim62 → Yükseklik-Ekstrüzyon34 (add)
    with BuildSketch(Plane(origin=(-3.156e-14, 8.628732259524103, 61.39662026197741), x_dir=(-1, -7e-17, -5e-16), z_dir=(0, -0.13917310096006608, -0.9902680687415704))):
        with BuildLine():
            Line((27.000000000000004, -117.92459776432452), (26.500000000000004, -117.92459776432452))
            ThreePointArc((26.500000000000004, -117.92459776432452), (25.750000000000004, -117.17459776432452), (26.500000000000004, -116.42459776432452))
            Line((26.500000000000004, -116.42459776432452), (27.000000000000004, -116.42459776432452))
            Line((27.000000000000004, -116.42459776432452), (27.000000000000004, -117.92459776432452))
        make_face()
    extrude(amount=Y_KSEKLIK_EKSTR_ZYON34_DEPTH)

    # Radyus9
    radyus9_edges = [part_2.edges().sort_by_distance(p)[0] for p in [
        (-13.499999999999998, -113.90786414253479, 10.959568443165423),
        (-13.5, -104.58326637821037, 77.30752904885065),
    ]]
    fillet(radyus9_edges, radius=RADYUS9_R)

    # Çizim63 → Kes-Ekstrüzyon30 (cut)
    with BuildSketch(Plane(origin=(-9.75e-15, -134.99789615004912, 18.97271700799474), x_dir=(1, -7e-17, 1e-17), z_dir=(0, -0.9902680687415704, 0.13917310096006608))):
        with Locations(Location((-28.697056274847743, 63.69705627484778, 0), (0, 0, 270))):
            Circle(IZIM63_R)
        with Locations(Location((-28.697056274847743, -6.697056274847762, 0), (0, 0, 90))):
            Circle(IZIM63_R_2)
    extrude(amount=-KES_EKSTR_ZYON30_DEPTH, mode=Mode.SUBTRACT)

    # Radyus10
    radyus10_edges = [part_2.edges().sort_by_distance(p)[0] for p in [
        (-7.749999999999994, -111.20050791711931, 30.223408957195126),
        (-16.914213562373092, -111.11898220209441, 30.803494561478942),
        (-17.5, -108.41704589791797, 50.02877033202655),
        (-16.914213562373085, -105.71510959374154, 69.25404610257414),
        (-7.749999999999997, -105.63358387871666, 69.83413170685793),
    ]]
    fillet(radyus10_edges, radius=RADYUS10_R)

    # Çizim64 → Kes-Ekstrüzyon31 (cut)
    with BuildSketch(Plane(origin=(-17.499999999999996, 0, 0), x_dir=(0, 0, -1), z_dir=(1, 0, 0)).offset(KES_EKSTR_ZYON31_START)):
        with Locations(Location((-36.999999999999986, -80, 0), (0, 0, 180))):
            Circle(IZIM64_R)
    extrude(amount=KES_EKSTR_ZYON31_DEPTH, mode=Mode.SUBTRACT)

    # Çizim65 → Kes-Ekstrüzyon32 (cut)
    with BuildSketch(Plane(origin=(-3, -2.422e-14, 0), x_dir=(0, 0, -1), z_dir=(1, 8.07e-15, 0))):
        with Locations(Location((-32.00000000000001, 53.8, 0), (0, 0, 90))):
            Circle(IZIM65_R)
        with Locations(Location((-32, 1, 0), (0, 0, 90))):
            Circle(IZIM65_R_2)
    extrude(amount=-KES_EKSTR_ZYON32_DEPTH, mode=Mode.SUBTRACT)

    # Çizim68 → Yükseklik-Ekstrüzyon35 (add)
    with BuildSketch(Plane(origin=(-4.999999999999996, 0, 0), x_dir=(0, 0, -1), z_dir=(1, 0, 0))):
        with Locations(Location((-36.999999999999986, -80, 0), (0, 0, 180))):
            Circle(IZIM68_R)
    extrude(amount=Y_KSEKLIK_EKSTR_ZYON35_DEPTH)

    # Çizim69 → Kes-Ekstrüzyon35 (cut)
    with BuildSketch(Plane(origin=(0, 0, 0), x_dir=(0, 0, -1), z_dir=(1, 0, 0))):
        with Locations((-36.999999999999986, -80)):
            Circle(IZIM69_R)
    extrude(amount=-KES_EKSTR_ZYON35_DEPTH, mode=Mode.SUBTRACT)

    # Çizim70 → Kes-Ekstrüzyon36 (cut)
    with BuildSketch(Plane(origin=(-3, 0, 0), x_dir=(0, 0, -1), z_dir=(1, 0, 0))):
        with Locations((-36.999999999999986, -80)):
            Circle(IZIM70_R)
    extrude(amount=-KES_EKSTR_ZYON36_DEPTH, mode=Mode.SUBTRACT)

    # Çizim71 → Yükseklik-Ekstrüzyon36 (add)
    with BuildSketch(Plane.ZY.offset(4.999999999999996).offset(Y_KSEKLIK_EKSTR_ZYON36_START)):
        with Locations((36.999999999999986, -80)):
            Circle(IZIM71_R)
        with Locations(Location((36.999999999999986, -80, 0), (0, 0, 180))):
            Circle(IZIM71_R_2, mode=Mode.SUBTRACT)
    extrude(amount=-Y_KSEKLIK_EKSTR_ZYON36_DEPTH)

    # Çizim72 → Kes-Ekstrüzyon37 (cut)
    with BuildSketch(Plane.XY.offset(67)):
        with Locations((0, 28.367009357883862)):
            Circle(IZIM72_R)
    extrude(amount=-KES_EKSTR_ZYON37_DEPTH, mode=Mode.SUBTRACT)


with BuildPart() as body_2_3:
    # Aynalama6: mirrored copy
    add(part_2.part.mirror(Plane(origin=(40, 0, 0), x_dir=(0, 0, 1), z_dir=(1, 0, 0))))


solid = body_2_3.part
